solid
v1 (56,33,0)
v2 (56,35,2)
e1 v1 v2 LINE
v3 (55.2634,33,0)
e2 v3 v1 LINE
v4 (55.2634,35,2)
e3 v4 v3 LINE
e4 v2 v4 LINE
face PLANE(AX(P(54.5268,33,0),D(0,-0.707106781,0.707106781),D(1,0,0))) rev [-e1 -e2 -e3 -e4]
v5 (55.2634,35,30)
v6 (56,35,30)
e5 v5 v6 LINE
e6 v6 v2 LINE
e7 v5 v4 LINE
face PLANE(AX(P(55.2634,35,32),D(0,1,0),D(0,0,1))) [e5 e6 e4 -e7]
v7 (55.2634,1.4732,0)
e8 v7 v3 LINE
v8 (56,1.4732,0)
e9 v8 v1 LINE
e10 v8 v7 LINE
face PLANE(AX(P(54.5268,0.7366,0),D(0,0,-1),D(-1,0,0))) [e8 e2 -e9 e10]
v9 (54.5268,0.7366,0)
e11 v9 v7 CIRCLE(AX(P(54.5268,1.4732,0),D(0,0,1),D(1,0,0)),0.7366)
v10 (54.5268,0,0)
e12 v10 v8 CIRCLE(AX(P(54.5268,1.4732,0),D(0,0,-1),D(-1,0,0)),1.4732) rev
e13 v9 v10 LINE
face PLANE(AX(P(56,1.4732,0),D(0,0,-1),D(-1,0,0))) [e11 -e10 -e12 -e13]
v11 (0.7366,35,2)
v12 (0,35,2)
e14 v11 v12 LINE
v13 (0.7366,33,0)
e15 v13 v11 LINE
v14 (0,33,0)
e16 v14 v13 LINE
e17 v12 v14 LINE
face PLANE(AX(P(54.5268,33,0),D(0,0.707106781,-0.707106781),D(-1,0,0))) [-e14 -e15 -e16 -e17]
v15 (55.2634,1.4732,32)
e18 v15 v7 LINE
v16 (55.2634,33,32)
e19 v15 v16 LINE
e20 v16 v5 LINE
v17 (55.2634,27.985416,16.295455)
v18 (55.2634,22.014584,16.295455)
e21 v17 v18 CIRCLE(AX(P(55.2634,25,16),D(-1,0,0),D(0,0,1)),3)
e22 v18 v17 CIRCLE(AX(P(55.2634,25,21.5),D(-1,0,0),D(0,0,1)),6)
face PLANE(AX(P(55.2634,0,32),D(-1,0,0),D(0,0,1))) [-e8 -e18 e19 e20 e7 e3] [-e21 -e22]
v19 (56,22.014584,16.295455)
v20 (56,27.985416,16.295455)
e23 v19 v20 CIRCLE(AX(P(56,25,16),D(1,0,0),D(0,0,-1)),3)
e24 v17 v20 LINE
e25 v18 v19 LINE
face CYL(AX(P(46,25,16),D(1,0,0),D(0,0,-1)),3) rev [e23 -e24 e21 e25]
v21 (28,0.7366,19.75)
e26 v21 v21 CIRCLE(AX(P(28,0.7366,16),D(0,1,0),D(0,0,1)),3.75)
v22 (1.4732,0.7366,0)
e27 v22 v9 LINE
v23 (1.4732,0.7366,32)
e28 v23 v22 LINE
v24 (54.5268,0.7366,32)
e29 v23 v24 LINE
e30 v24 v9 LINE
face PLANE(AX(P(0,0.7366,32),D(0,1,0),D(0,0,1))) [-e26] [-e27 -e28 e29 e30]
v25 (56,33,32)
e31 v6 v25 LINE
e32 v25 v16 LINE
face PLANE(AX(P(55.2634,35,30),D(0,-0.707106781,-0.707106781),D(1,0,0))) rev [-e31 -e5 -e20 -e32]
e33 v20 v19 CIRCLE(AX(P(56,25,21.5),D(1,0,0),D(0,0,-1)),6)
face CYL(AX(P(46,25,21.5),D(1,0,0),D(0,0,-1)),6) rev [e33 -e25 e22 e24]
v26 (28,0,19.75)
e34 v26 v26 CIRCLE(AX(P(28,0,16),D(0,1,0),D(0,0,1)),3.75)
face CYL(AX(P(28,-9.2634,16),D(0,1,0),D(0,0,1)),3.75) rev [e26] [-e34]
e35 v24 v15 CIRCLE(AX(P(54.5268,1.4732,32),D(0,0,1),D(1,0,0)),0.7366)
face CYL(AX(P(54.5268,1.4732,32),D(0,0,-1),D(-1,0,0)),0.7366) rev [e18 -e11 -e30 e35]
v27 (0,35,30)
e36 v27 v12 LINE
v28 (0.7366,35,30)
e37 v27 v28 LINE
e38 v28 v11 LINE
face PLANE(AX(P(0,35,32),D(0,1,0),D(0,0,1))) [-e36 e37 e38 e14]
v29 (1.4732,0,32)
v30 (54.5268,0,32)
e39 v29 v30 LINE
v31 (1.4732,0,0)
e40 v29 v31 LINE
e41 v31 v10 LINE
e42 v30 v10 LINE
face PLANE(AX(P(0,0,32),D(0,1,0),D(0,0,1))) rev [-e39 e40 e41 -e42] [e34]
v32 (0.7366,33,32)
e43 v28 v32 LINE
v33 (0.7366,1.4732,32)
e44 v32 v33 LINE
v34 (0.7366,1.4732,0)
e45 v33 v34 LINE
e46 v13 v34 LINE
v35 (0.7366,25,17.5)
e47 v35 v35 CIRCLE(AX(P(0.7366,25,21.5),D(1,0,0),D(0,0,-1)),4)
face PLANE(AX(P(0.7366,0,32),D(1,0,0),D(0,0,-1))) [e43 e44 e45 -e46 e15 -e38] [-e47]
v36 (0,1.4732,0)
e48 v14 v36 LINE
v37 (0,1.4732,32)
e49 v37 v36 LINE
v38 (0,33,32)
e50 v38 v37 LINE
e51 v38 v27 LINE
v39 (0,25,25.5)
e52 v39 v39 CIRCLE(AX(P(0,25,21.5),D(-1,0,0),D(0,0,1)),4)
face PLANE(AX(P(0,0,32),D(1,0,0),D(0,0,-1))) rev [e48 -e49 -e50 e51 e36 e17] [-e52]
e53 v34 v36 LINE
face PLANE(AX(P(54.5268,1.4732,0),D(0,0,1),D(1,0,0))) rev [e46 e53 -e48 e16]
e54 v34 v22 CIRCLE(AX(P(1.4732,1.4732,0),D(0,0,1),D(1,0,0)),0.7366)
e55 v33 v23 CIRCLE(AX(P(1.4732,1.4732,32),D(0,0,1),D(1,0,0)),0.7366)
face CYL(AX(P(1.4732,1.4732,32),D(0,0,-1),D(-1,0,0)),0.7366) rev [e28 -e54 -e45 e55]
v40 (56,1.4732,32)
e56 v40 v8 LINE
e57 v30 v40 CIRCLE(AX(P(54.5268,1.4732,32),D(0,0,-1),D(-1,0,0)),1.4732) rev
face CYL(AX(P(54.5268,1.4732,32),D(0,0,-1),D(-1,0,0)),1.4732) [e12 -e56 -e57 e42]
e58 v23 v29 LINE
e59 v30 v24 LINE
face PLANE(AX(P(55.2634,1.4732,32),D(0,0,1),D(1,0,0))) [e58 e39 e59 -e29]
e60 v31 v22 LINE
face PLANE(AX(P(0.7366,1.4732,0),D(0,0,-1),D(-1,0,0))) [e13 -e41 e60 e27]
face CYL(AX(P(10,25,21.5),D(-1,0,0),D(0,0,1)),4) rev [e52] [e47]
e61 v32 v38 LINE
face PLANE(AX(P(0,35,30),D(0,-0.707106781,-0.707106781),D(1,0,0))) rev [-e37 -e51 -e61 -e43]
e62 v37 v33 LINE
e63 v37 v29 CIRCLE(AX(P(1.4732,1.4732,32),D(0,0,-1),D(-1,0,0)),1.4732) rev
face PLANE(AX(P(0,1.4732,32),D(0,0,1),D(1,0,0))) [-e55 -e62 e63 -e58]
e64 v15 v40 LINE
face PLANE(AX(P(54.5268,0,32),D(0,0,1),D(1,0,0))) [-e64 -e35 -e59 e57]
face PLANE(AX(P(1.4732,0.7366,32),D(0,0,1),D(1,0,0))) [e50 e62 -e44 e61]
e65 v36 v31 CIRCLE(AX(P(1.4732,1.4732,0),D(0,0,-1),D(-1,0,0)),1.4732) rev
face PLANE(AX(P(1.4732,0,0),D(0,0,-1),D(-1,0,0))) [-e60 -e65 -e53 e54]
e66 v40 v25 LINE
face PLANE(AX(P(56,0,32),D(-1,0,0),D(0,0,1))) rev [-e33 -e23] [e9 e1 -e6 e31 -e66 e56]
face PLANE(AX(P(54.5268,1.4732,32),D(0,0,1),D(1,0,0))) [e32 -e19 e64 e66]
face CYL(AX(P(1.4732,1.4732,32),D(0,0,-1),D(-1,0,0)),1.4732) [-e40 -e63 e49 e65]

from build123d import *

# Parameters (mm, degrees)
BASE_FLANGE1_DEPTH = 32
CUT_EXTRUDE1_DEPTH = 10
SKETCH7_R          = 4
CUT_EXTRUDE2_DEPTH = 10
SKETCH8_R          = 3.75
CUT_EXTRUDE3_DEPTH = 10
CHAMFER1_SIZE      = 2


# Sheet-metal steps are written as plain solids
with BuildPart() as part:
    # Sketch1 → Base-Flange1 (new body)
    with BuildSketch(Plane.XY):
        with BuildLine():
            Line((56, 35), (56, 1.4732))
            ThreePointArc((56, 1.4732), (55.56850971, 0.43149029), (54.5268, 0))
            Line((54.5268, 0), (1.4732, 0))
            ThreePointArc((1.4732, 0), (0.43149029, 0.43149029), (0, 1.4732))
            Line((0, 1.4732), (0, 35))
            Line((0, 35), (0.7366, 35))
            Line((0.7366, 35), (0.7366, 1.4732))
            ThreePointArc((0.7366, 1.4732), (0.952345145, 0.952345145), (1.4732, 0.7366))
            Line((1.4732, 0.7366), (54.5268, 0.7366))
            ThreePointArc((54.5268, 0.7366), (55.047654855, 0.952345145), (55.2634, 1.4732))
            Line((55.2634, 1.4732), (55.2634, 35))
            Line((55.2634, 35), (56, 35))
        make_face()
    extrude(amount=BASE_FLANGE1_DEPTH)

    # Sketch6 → Cut-Extrude1 (cut)
    with BuildSketch(Plane(origin=(56, 0, 0), x_dir=(0, 0, -1), z_dir=(1, 0, 0))):
        with BuildLine():
            ThreePointArc((-16.295454545, 27.985415651), (-27.5, 25), (-16.295454545, 22.014584349))
            ThreePointArc((-16.295454545, 22.014584349), (-13, 25), (-16.295454545, 27.985415651))
        make_face()
    extrude(amount=-CUT_EXTRUDE1_DEPTH, mode=Mode.SUBTRACT)

    # Sketch7 → Cut-Extrude2 (cut)
    with BuildSketch(Plane.ZY):
        with Locations((21.5, 25)):
            Circle(SKETCH7_R)
    extrude(amount=-CUT_EXTRUDE2_DEPTH, mode=Mode.SUBTRACT)

    # Sketch8 → Cut-Extrude3 (cut)
    with BuildSketch(Plane(origin=(0, 0.7366, 0), x_dir=(1, 0, 0), z_dir=(0, 1, 0))):
        with Locations(Location((28, -16, 0), (0, 0, 270))):
            Circle(SKETCH8_R)
    extrude(amount=-CUT_EXTRUDE3_DEPTH, mode=Mode.SUBTRACT)

    # Chamfer1
    chamfer1_edges = [part.edges().sort_by_distance(p)[0] for p in [
        (0.3683, 35, 0),
        (55.6317, 35, 0),
        (0.3683, 35, 32),
        (55.6317, 35, 32),
    ]]
    chamfer(chamfer1_edges, length=CHAMFER1_SIZE)


solid = part.part
